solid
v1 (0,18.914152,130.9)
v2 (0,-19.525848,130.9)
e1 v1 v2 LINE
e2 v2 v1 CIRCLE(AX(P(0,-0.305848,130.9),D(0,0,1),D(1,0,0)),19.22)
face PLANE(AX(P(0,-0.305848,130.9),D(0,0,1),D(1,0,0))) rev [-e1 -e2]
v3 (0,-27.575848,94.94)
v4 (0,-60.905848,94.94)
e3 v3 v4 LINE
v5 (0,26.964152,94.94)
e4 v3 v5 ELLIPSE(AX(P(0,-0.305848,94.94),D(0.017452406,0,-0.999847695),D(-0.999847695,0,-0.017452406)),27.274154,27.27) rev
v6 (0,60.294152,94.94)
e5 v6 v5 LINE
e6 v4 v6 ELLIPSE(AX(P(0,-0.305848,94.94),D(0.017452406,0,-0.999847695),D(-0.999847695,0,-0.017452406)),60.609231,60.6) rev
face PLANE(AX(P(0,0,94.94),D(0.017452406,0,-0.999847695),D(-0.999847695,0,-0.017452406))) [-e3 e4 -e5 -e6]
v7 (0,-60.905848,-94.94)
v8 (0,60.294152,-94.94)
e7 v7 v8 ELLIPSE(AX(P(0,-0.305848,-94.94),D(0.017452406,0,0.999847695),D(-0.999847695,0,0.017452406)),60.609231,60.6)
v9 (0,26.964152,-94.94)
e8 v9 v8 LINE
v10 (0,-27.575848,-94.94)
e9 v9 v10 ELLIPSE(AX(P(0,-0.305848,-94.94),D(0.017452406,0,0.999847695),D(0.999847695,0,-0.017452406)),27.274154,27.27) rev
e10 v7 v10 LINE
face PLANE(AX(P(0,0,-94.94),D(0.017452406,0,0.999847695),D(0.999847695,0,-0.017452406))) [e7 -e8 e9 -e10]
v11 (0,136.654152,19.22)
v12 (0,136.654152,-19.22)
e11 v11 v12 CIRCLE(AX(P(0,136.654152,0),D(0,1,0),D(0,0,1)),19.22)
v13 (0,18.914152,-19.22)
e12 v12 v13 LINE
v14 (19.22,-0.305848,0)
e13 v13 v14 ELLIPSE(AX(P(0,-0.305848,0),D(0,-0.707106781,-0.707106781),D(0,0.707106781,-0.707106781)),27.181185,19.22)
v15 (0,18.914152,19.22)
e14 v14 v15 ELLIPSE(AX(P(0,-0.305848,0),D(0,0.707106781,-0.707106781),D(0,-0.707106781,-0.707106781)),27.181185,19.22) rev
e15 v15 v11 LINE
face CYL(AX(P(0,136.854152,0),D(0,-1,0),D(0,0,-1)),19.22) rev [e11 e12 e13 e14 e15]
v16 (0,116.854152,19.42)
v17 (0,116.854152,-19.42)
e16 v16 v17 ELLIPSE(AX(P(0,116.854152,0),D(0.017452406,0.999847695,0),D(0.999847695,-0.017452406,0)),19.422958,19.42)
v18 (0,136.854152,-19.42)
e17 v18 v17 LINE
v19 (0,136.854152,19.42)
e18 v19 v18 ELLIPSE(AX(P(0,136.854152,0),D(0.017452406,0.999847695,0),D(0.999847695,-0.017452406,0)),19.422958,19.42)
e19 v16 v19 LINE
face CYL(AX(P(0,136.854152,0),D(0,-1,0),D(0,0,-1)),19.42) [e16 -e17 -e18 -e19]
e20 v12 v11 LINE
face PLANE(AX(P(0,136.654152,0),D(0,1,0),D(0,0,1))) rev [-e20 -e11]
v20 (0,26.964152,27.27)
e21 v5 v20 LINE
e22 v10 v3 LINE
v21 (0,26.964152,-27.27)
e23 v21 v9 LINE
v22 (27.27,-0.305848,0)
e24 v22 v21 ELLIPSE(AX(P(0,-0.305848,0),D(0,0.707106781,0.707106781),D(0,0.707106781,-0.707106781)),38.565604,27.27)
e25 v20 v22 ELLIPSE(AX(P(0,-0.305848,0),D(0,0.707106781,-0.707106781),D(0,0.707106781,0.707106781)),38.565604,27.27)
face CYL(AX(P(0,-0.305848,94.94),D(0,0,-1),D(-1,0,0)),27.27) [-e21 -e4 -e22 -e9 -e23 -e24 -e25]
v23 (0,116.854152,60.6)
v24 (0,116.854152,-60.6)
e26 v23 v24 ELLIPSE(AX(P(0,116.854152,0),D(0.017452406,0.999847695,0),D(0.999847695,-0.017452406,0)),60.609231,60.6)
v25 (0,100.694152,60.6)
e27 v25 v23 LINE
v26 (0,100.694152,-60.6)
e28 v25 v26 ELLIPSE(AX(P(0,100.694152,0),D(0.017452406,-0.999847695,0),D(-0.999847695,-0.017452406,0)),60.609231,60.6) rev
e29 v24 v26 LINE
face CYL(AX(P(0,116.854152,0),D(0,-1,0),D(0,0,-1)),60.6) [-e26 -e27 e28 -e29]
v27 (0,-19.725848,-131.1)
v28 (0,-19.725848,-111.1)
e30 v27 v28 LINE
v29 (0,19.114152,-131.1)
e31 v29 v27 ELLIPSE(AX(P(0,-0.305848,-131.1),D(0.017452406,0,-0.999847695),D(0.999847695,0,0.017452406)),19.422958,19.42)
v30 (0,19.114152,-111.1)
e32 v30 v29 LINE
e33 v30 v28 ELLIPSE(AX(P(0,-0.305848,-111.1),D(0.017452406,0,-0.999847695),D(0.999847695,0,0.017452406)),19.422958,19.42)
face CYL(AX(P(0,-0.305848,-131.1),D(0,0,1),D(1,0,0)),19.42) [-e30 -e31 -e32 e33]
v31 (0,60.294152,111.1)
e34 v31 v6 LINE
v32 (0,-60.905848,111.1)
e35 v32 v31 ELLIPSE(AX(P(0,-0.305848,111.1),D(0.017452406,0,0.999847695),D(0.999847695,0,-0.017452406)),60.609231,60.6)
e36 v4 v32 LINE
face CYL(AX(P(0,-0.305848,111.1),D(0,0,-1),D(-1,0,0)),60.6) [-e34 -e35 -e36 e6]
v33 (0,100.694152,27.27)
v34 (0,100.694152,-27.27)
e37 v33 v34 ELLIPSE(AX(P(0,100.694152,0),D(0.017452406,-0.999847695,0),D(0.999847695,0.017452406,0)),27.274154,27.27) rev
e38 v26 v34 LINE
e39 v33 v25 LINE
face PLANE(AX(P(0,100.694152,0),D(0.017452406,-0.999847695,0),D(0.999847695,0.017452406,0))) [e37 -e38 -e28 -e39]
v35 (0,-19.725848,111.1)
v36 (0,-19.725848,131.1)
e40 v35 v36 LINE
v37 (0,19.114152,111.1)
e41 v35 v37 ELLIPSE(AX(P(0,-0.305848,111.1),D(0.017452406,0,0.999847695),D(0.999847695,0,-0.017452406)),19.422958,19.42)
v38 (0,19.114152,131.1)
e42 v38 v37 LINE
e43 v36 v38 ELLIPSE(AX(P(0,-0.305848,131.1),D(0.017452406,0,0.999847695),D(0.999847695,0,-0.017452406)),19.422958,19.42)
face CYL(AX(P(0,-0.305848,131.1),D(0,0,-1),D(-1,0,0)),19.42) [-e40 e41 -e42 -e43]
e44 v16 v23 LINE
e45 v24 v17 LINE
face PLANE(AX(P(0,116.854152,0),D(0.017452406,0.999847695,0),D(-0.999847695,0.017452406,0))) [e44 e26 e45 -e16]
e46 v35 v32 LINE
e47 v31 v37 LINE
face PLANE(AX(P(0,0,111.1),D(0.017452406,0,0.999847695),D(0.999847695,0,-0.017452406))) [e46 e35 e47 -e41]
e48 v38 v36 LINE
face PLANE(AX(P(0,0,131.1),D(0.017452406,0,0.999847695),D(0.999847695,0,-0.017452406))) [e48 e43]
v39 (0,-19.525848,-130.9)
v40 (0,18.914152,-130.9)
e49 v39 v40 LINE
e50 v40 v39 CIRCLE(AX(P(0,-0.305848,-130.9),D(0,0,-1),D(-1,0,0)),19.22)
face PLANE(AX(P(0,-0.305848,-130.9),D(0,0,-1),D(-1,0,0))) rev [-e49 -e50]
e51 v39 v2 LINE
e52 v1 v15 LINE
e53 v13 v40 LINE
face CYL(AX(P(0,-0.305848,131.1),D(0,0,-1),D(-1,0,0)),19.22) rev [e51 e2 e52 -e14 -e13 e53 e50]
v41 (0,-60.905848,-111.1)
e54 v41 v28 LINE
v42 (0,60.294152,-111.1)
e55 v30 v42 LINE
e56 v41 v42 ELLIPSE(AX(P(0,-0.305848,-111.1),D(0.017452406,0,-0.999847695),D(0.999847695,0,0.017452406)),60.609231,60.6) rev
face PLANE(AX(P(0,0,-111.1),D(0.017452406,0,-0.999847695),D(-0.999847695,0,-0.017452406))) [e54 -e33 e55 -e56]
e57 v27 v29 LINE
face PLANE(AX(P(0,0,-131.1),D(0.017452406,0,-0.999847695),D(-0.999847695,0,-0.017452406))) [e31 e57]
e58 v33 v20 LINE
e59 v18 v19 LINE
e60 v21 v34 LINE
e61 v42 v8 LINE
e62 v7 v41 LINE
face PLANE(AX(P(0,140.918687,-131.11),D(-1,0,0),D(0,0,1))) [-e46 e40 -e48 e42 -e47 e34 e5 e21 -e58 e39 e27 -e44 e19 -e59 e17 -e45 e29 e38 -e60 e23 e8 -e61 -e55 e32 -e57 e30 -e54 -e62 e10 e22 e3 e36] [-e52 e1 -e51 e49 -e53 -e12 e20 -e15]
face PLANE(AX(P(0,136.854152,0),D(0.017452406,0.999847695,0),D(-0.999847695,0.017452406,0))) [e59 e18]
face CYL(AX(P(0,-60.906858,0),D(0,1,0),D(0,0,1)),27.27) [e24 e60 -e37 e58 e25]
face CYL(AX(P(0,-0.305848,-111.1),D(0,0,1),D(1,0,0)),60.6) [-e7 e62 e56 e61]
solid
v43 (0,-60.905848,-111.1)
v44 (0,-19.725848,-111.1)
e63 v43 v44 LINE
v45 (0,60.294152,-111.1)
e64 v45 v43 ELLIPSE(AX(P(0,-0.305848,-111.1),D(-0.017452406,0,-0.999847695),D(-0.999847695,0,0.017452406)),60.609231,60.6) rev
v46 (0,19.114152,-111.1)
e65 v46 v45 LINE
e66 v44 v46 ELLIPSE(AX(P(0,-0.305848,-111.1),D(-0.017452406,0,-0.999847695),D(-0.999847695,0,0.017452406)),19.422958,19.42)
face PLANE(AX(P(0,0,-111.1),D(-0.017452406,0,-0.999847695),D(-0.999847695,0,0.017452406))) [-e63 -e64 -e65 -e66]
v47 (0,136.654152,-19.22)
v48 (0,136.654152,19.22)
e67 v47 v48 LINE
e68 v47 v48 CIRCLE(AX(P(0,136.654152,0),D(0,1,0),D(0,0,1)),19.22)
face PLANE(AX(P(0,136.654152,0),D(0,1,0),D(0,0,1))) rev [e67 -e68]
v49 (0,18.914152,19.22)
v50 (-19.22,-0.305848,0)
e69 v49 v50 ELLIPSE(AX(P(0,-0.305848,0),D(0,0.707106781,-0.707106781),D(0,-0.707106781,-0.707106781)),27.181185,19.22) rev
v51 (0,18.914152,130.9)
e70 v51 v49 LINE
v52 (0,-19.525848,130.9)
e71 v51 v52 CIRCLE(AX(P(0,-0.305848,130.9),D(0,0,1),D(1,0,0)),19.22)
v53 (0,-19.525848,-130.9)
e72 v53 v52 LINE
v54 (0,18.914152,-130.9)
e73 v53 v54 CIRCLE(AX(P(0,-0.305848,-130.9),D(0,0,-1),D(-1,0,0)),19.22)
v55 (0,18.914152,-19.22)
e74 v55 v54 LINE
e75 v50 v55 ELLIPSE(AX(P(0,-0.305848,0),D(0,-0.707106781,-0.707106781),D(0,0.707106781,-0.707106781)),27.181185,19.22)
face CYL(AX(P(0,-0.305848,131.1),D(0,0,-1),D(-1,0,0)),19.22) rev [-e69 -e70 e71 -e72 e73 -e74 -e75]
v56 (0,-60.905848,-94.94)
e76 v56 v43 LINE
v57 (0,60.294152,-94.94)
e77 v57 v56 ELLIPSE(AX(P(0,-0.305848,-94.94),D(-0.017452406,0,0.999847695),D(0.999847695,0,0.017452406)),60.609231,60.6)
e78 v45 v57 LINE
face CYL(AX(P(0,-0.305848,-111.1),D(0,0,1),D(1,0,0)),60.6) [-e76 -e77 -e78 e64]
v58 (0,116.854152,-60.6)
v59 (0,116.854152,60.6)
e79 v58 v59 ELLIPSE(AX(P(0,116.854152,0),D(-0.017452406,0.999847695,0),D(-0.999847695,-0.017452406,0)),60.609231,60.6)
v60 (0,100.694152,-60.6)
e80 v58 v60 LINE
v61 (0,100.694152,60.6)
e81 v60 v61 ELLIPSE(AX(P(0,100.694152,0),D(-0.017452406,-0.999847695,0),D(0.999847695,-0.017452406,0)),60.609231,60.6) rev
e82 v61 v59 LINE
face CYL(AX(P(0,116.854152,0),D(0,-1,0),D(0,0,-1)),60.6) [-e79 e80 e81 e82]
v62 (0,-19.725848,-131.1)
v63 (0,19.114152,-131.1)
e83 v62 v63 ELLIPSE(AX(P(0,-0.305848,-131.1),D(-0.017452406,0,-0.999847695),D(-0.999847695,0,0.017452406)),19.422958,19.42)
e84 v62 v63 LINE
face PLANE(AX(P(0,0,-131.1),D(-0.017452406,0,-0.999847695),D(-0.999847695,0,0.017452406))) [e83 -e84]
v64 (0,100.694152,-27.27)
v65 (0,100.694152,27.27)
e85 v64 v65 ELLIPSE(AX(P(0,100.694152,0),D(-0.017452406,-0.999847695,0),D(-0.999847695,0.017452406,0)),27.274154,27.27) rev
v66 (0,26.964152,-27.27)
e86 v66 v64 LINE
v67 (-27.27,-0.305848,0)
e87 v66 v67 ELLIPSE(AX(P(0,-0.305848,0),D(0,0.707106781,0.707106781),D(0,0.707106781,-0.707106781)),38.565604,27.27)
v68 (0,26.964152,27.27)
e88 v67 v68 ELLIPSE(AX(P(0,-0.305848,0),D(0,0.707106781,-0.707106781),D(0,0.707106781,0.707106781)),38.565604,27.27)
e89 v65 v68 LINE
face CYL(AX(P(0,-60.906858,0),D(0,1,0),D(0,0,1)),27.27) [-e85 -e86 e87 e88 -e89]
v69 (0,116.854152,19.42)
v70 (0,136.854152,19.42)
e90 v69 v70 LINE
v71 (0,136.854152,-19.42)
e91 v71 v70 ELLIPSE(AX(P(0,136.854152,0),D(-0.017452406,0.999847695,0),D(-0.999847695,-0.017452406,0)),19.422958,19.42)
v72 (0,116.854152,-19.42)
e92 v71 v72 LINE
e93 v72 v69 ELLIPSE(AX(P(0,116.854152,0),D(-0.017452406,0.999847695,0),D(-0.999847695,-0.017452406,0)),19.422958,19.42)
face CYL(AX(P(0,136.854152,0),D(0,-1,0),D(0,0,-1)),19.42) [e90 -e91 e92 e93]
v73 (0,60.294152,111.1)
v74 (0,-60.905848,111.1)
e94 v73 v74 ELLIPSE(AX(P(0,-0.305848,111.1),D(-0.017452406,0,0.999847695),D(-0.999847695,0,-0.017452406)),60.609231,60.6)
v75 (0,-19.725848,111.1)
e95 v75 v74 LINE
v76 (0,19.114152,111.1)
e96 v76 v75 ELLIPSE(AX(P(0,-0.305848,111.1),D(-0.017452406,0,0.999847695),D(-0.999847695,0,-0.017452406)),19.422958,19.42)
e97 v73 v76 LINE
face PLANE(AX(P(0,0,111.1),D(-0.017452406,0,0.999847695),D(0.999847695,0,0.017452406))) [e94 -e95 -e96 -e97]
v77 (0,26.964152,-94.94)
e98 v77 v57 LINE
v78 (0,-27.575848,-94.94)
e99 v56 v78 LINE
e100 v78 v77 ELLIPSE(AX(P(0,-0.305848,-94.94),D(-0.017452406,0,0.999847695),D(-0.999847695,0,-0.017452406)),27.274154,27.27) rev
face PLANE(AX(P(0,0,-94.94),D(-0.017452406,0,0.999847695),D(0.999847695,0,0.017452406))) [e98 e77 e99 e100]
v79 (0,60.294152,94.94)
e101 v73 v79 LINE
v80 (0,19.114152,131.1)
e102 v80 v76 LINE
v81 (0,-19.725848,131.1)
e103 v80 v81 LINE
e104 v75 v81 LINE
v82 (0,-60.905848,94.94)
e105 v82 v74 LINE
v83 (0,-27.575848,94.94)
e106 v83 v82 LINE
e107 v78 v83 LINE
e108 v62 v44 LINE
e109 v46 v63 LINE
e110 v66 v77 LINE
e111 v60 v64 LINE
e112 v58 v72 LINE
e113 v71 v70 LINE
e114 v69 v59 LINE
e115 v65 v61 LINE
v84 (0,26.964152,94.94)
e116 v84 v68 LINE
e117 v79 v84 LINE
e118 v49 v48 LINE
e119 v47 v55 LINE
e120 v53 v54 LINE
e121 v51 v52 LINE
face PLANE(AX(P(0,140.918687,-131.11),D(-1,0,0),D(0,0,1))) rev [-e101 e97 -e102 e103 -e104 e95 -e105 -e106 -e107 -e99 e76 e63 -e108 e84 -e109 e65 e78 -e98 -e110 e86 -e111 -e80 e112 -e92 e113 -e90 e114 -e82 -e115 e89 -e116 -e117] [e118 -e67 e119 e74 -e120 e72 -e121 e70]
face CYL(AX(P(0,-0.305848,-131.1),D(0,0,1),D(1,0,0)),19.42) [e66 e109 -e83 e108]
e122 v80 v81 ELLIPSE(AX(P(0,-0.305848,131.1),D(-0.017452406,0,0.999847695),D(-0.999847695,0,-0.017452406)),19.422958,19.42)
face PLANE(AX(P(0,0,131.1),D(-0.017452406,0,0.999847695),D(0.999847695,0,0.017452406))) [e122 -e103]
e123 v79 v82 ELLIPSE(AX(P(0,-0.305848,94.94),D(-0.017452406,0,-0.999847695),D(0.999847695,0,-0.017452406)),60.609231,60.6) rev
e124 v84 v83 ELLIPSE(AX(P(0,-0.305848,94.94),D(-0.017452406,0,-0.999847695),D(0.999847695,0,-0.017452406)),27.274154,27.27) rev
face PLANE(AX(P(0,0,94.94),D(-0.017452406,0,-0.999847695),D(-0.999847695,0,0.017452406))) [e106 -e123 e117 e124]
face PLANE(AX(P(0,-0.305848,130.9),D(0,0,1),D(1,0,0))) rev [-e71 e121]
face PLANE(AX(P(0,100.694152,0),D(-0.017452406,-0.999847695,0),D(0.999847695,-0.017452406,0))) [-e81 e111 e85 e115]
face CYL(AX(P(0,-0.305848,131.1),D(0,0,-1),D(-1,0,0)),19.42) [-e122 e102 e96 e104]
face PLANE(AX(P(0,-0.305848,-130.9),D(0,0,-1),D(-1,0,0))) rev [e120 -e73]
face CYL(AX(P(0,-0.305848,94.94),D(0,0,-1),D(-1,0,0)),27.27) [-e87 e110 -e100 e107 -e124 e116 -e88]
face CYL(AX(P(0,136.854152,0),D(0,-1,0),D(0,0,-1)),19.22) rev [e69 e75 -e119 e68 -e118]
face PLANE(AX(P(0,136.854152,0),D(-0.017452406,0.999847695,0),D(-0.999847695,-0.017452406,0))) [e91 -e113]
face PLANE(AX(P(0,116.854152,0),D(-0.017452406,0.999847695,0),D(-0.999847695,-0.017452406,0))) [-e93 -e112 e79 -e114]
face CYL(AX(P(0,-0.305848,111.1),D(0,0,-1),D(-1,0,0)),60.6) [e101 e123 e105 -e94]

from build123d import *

# Parameters (mm, degrees)
SKETCH1_R                = 27
SKETCH1_R_2              = 22
BOSS_EXTRUDE1_DEPTH      = 94
SKETCH2_R                = 60
SKETCH2_R_2              = 22
BOSS_EXTRUDE2_DEPTH      = 16
BOSS_EXTRUDE3_REACH      = 205.224
BOSS_EXTRUDE3_END_RADIUS = 27
SKETCH3_R                = 27
SKETCH3_R_2              = 22
SKETCH4_R                = 22
CUT_EXTRUDE5_DEPTH       = 100
BOSS_EXTRUDE4_START      = 16
SKETCH6_R                = 60
SKETCH6_R_2              = 22
BOSS_EXTRUDE4_DEPTH      = 16
SCALE1_SCALE             = 1.01
MOVE_START               = 18.914152479
MOVE_FACE1_OUTLINE_R     = 22.22
MOVE_FACE1_OUTLINE_R_2   = 19.22
MOVE_FACE1_DEPTH         = 97.9399999
MOVE_START_2             = -111.1
MOVE_FACE1_2_OUTLINE_R   = 19.22
MOVE_FACE1_2_DEPTH       = 222.2
MOVE_FACE1_3_DEPTH       = 91.8799999
MOVE_START_3             = 19.2200001
MOVE_FACE1_4_DEPTH       = 91.8799999
MOVE_START_4             = -0.305847721
MOVE_FACE1_5_OUTLINE_R   = 19.22
MOVE_FACE1_5_DEPTH       = 19.220000155
MOVE_START_5             = 11.257393302
MOVE_FACE1_6_DEPTH       = 7.656759132
SKETCH7_R                = 19.42
BOSS_EXTRUDE5_DEPTH      = 20
SKETCH8_R                = 19.42
BOSS_EXTRUDE6_DEPTH      = 20
SKETCH10_R               = 19.42
BOSS_EXTRUDE7_DEPTH      = 20
SHELL1_T                 = -0.2
SHELL2_T                 = -0.2
SHELL3_T                 = -0.2
SPLIT1_SURFACE_1_BACK    = 351.068
SPLIT1_SURFACE_1_DEPTH   = 702.136
SPLIT1_SURFACE_2_BACK    = 351.068
SPLIT1_SURFACE_2_DEPTH   = 702.136
DRAFT11_ANGLE            = 1
DRAFT12_ANGLE            = -1


with BuildPart() as part:
    # Sketch1 → Boss-Extrude1 (new, symmetric)
    with BuildSketch(Plane.XY):
        Circle(SKETCH1_R)
        Circle(SKETCH1_R_2, mode=Mode.SUBTRACT)
    extrude(amount=BOSS_EXTRUDE1_DEPTH, both=True)

    # Sketch2 → Boss-Extrude2 (add)
    with BuildSketch(Plane.XY.offset(94)):
        Circle(SKETCH2_R)
        Circle(SKETCH2_R_2, mode=Mode.SUBTRACT)
    boss_extrude2 = extrude(amount=BOSS_EXTRUDE2_DEPTH)

    # Mirror1: Boss-Extrude2 across plane
    add(boss_extrude2.mirror(Plane.XY))

    # Boss-Extrude3: up to this cylinder (the profile starts outside it)
    boss_extrude3_end = Plane(origin=(0, 0, -26.236325), z_dir=(0, 0, -1)) * Cylinder(BOSS_EXTRUDE3_END_RADIUS, 465.448, mode=Mode.PRIVATE)
    # Sketch3 → Boss-Extrude3 (add, up to the surface)
    with BuildSketch(Plane(origin=(0, 100, 0), x_dir=(1, 0, 0), z_dir=(0, 1, 0)), mode=Mode.PRIVATE) as boss_extrude3_sk1:
        with Locations(Location((0, 0, 0), (0, 0, 270))):
            Circle(SKETCH3_R)
        with Locations(Location((0, 0, 0), (0, 0, 270))):
            Circle(SKETCH3_R_2, mode=Mode.SUBTRACT)
    boss_extrude3_tool1 = extrude(boss_extrude3_sk1.sketch, amount=-BOSS_EXTRUDE3_REACH, mode=Mode.PRIVATE) - boss_extrude3_end
    add(boss_extrude3_tool1.solids().sort_by_distance((0, 100, -26.236325))[0])

    # Sketch4 → Cut-Extrude5 (cut)
    with BuildSketch(Plane(origin=(0, 100, 0), x_dir=(1, 0, 0), z_dir=(0, 1, 0))):
        with Locations(Location((0, 0, 0), (0, 0, 270))):
            Circle(SKETCH4_R)
    extrude(amount=-CUT_EXTRUDE5_DEPTH, mode=Mode.SUBTRACT)

    # Sketch6 → Boss-Extrude4 (add)
    with BuildSketch(Plane(origin=(0, 100, 0), x_dir=(1, 0, 0), z_dir=(0, 1, 0)).offset(BOSS_EXTRUDE4_START)):
        with Locations(Location((0, 0, 0), (0, 0, 270))):
            Circle(SKETCH6_R)
        with Locations(Location((0, 0, 0), (0, 0, 270))):
            Circle(SKETCH6_R_2, mode=Mode.SUBTRACT)
    extrude(amount=-BOSS_EXTRUDE4_DEPTH)


with BuildPart() as part_1:
    # Scale1: scaled about (0, 30.584762689, 0)
    add(part.part.scale(SCALE1_SCALE).moved(Location((0, -0.305847627, 0))))

    # Move Face1: read off the stored shape, not the designer's step
    # Move Face1 outline → Move Face1 (add)
    with BuildSketch(Plane(origin=(0, 0, 0), x_dir=(1, 0, 0), z_dir=(0, 1, 0)).offset(MOVE_START)):
        with Locations((6e-09, 0)):
            Circle(MOVE_FACE1_OUTLINE_R)
        with Locations((6e-09, 0)):
            Circle(MOVE_FACE1_OUTLINE_R_2, mode=Mode.SUBTRACT)
    extrude(amount=MOVE_FACE1_DEPTH)

    # Move Face1 2 outline → Move Face1 2 (add)
    with BuildSketch(Plane.XY.offset(MOVE_START_2)):
        with BuildLine():
            Line((6e-09, 18.914152429), (-19.345399865, 18.914152479))
            ThreePointArc((-19.345399865, 18.914152479), (6e-09, -27.575847621), (19.345399877, 18.914152479))
            Line((19.345399877, 18.914152479), (6e-09, 18.914152429))
        make_face()
        with Locations((6e-09, -0.305847621)):
            Circle(MOVE_FACE1_2_OUTLINE_R, mode=Mode.SUBTRACT)
    extrude(amount=MOVE_FACE1_2_DEPTH)

    # Move Face1 3 outline → Move Face1 3 (add)
    with BuildSketch(Plane.XY.offset(MOVE_START_2)):
        with BuildLine():
            Line((-11.149887713, 18.914152479), (11.149887725, 18.914152479))
            ThreePointArc((11.149887725, 18.914152479), (6e-09, 21.914152379), (-11.149887713, 18.914152479))
        make_face()
    extrude(amount=MOVE_FACE1_3_DEPTH)

    # Move Face1 4 outline → Move Face1 4 (add)
    with BuildSketch(Plane.XY.offset(MOVE_START_3)):
        with BuildLine():
            Line((-11.149887713, 18.914152479), (11.149887725, 18.914152479))
            ThreePointArc((11.149887725, 18.914152479), (6e-09, 21.914152379), (-11.149887713, 18.914152479))
        make_face()
    extrude(amount=MOVE_FACE1_4_DEPTH)

    # Move Face1 5 outline → Move Face1 5 (cut)
    with BuildSketch(Plane(origin=(0, 0, 0), x_dir=(1, 0, 0), z_dir=(0, 1, 0)).offset(MOVE_START_4)):
        with Locations((6e-09, 0)):
            Circle(MOVE_FACE1_5_OUTLINE_R)
    extrude(amount=MOVE_FACE1_5_DEPTH, mode=Mode.SUBTRACT)

    # Move Face1 6 outline → Move Face1 6 (add)
    with BuildSketch(Plane(origin=(0, 0, 0), x_dir=(1, 0, 0), z_dir=(0, 1, 0)).offset(MOVE_START_5)):
        with BuildLine():
            ThreePointArc((19.345399877, -10.930869308), (22.220000006, 0), (19.345399877, 10.930869308))
            Line((19.345399877, 10.930869308), (19.345399877, -10.930869308))
        make_face()
        with BuildLine():
            Line((-19.345399865, -10.930869308), (-19.345399865, 10.930869308))
            ThreePointArc((-19.345399865, 10.930869308), (-22.219999994, 0), (-19.345399865, -10.930869308))
        make_face()
    extrude(amount=MOVE_FACE1_6_DEPTH)


with BuildPart() as body_2:
    # Sketch7 → Boss-Extrude5 (new body)
    with BuildSketch(Plane(origin=(0, 116.854152379, 0), x_dir=(1, 0, 0), z_dir=(0, 1, 0))):
        with Locations(Location((6e-09, 0, 0), (0, 0, 270))):
            Circle(SKETCH7_R)
    extrude(amount=BOSS_EXTRUDE5_DEPTH)

    # Shell1
    shell1_openings = [body_2.faces().sort_by_distance(p)[0] for p in [
        (6e-09, 116.854152379, 0),
    ]]
    offset(amount=SHELL1_T, openings=shell1_openings, kind=Kind.INTERSECTION)


with BuildPart() as body_3:
    # Sketch8 → Boss-Extrude6 (new body)
    with BuildSketch(Plane(origin=(0, 0, -111.1), x_dir=(-1, 0, 0), z_dir=(0, 0, -1))):
        with Locations((-6e-09, -0.305847621)):
            Circle(SKETCH8_R)
    extrude(amount=BOSS_EXTRUDE6_DEPTH)

    # Shell2
    shell2_openings = [body_3.faces().sort_by_distance(p)[0] for p in [
        (6e-09, -0.305847621, -111.1),
    ]]
    offset(amount=SHELL2_T, openings=shell2_openings, kind=Kind.INTERSECTION)


with BuildPart() as body_4:
    # Sketch10 → Boss-Extrude7 (new body)
    with BuildSketch(Plane.XY.offset(111.1)):
        with Locations(Location((6e-09, -0.305847621, 0), (0, 0, 180))):
            Circle(SKETCH10_R)
    extrude(amount=BOSS_EXTRUDE7_DEPTH)

    # Shell3
    shell3_openings = [body_4.faces().sort_by_distance(p)[0] for p in [
        (6e-09, -0.305847621, 111.1),
    ]]
    offset(amount=SHELL3_T, openings=shell3_openings, kind=Kind.INTERSECTION)

    # Combine6: union body 2, body 3, part
    add(body_2.part)
    add(body_3.part)
    add(part_1.part)


with BuildPart() as body_2_2:
    # Split1: the piece behind the surface
    add(body_4.part)
    # Split1 surface: a surface, the sketch's curves swept straight by 702.136 mm
    with BuildLine(Plane.XY.offset(-SPLIT1_SURFACE_1_BACK), mode=Mode.PRIVATE) as split1_surface_1_path:
        Line((0, 140.918686574), (0, -64.970381816))
    split1_surface_1 = Shell.extrude(split1_surface_1_path.wire(), (0 * SPLIT1_SURFACE_1_DEPTH, 0 * SPLIT1_SURFACE_1_DEPTH, 1 * SPLIT1_SURFACE_1_DEPTH))
    split(bisect_by=split1_surface_1, keep=Keep.BOTTOM)

    # Draft12
    draft12_faces = [body_2_2.faces().sort_by_distance(p)[0] for p in [
        (-29.311291464, -0.305847627, 94.94),
        (-8.242103984, -0.305847621, 131.1),
        (-27.719709478, -0.305847628, 111.1),
        (-29.311291464, -0.305847627, -94.94),
        (-8.242103984, -0.305847621, -131.1),
        (-27.719709478, -0.305847628, -111.1),
        (-29.311291464, 100.694152373, 0),
        (-8.242103984, 136.854152379, 0),
        (-27.719709478, 116.854152373, 0),
    ]]
    draft(draft12_faces, Plane(origin=(0, 0, 0), x_dir=(0, 0, 1), z_dir=(1, 0, 0)), DRAFT12_ANGLE)


with BuildPart() as body_4_1:
    add(body_4.part)

    # Split1: split by a surface, the side it looks to stays
    # Split1 surface: a surface, the sketch's curves swept straight by 702.136 mm
    with BuildLine(Plane.XY.offset(-SPLIT1_SURFACE_2_BACK), mode=Mode.PRIVATE) as split1_surface_2_path:
        Line((0, 140.918686574), (0, -64.970381816))
    split1_surface_2 = Shell.extrude(split1_surface_2_path.wire(), (0 * SPLIT1_SURFACE_2_DEPTH, 0 * SPLIT1_SURFACE_2_DEPTH, 1 * SPLIT1_SURFACE_2_DEPTH))
    split(bisect_by=split1_surface_2, keep=Keep.TOP)

    # Draft11
    draft11_faces = [body_4_1.faces().sort_by_distance(p)[0] for p in [
        (29.311291464, 100.694152373, 0),
        (8.242103989, -0.305847621, -131.1),
        (8.242103989, -0.305847621, 131.1),
        (27.719709479, -0.305847628, 111.1),
        (29.311291464, -0.305847627, 94.94),
        (29.311291464, -0.305847627, -94.94),
        (27.719709479, -0.305847628, -111.1),
        (8.242103989, 136.854152379, 0),
        (27.719709479, 116.854152373, 0),
    ]]
    draft(draft11_faces, Plane(origin=(0, 0, 0), x_dir=(0, 0, 1), z_dir=(1, 0, 0)), DRAFT11_ANGLE)


solid = Compound([body_2_2.part, body_4_1.part])
